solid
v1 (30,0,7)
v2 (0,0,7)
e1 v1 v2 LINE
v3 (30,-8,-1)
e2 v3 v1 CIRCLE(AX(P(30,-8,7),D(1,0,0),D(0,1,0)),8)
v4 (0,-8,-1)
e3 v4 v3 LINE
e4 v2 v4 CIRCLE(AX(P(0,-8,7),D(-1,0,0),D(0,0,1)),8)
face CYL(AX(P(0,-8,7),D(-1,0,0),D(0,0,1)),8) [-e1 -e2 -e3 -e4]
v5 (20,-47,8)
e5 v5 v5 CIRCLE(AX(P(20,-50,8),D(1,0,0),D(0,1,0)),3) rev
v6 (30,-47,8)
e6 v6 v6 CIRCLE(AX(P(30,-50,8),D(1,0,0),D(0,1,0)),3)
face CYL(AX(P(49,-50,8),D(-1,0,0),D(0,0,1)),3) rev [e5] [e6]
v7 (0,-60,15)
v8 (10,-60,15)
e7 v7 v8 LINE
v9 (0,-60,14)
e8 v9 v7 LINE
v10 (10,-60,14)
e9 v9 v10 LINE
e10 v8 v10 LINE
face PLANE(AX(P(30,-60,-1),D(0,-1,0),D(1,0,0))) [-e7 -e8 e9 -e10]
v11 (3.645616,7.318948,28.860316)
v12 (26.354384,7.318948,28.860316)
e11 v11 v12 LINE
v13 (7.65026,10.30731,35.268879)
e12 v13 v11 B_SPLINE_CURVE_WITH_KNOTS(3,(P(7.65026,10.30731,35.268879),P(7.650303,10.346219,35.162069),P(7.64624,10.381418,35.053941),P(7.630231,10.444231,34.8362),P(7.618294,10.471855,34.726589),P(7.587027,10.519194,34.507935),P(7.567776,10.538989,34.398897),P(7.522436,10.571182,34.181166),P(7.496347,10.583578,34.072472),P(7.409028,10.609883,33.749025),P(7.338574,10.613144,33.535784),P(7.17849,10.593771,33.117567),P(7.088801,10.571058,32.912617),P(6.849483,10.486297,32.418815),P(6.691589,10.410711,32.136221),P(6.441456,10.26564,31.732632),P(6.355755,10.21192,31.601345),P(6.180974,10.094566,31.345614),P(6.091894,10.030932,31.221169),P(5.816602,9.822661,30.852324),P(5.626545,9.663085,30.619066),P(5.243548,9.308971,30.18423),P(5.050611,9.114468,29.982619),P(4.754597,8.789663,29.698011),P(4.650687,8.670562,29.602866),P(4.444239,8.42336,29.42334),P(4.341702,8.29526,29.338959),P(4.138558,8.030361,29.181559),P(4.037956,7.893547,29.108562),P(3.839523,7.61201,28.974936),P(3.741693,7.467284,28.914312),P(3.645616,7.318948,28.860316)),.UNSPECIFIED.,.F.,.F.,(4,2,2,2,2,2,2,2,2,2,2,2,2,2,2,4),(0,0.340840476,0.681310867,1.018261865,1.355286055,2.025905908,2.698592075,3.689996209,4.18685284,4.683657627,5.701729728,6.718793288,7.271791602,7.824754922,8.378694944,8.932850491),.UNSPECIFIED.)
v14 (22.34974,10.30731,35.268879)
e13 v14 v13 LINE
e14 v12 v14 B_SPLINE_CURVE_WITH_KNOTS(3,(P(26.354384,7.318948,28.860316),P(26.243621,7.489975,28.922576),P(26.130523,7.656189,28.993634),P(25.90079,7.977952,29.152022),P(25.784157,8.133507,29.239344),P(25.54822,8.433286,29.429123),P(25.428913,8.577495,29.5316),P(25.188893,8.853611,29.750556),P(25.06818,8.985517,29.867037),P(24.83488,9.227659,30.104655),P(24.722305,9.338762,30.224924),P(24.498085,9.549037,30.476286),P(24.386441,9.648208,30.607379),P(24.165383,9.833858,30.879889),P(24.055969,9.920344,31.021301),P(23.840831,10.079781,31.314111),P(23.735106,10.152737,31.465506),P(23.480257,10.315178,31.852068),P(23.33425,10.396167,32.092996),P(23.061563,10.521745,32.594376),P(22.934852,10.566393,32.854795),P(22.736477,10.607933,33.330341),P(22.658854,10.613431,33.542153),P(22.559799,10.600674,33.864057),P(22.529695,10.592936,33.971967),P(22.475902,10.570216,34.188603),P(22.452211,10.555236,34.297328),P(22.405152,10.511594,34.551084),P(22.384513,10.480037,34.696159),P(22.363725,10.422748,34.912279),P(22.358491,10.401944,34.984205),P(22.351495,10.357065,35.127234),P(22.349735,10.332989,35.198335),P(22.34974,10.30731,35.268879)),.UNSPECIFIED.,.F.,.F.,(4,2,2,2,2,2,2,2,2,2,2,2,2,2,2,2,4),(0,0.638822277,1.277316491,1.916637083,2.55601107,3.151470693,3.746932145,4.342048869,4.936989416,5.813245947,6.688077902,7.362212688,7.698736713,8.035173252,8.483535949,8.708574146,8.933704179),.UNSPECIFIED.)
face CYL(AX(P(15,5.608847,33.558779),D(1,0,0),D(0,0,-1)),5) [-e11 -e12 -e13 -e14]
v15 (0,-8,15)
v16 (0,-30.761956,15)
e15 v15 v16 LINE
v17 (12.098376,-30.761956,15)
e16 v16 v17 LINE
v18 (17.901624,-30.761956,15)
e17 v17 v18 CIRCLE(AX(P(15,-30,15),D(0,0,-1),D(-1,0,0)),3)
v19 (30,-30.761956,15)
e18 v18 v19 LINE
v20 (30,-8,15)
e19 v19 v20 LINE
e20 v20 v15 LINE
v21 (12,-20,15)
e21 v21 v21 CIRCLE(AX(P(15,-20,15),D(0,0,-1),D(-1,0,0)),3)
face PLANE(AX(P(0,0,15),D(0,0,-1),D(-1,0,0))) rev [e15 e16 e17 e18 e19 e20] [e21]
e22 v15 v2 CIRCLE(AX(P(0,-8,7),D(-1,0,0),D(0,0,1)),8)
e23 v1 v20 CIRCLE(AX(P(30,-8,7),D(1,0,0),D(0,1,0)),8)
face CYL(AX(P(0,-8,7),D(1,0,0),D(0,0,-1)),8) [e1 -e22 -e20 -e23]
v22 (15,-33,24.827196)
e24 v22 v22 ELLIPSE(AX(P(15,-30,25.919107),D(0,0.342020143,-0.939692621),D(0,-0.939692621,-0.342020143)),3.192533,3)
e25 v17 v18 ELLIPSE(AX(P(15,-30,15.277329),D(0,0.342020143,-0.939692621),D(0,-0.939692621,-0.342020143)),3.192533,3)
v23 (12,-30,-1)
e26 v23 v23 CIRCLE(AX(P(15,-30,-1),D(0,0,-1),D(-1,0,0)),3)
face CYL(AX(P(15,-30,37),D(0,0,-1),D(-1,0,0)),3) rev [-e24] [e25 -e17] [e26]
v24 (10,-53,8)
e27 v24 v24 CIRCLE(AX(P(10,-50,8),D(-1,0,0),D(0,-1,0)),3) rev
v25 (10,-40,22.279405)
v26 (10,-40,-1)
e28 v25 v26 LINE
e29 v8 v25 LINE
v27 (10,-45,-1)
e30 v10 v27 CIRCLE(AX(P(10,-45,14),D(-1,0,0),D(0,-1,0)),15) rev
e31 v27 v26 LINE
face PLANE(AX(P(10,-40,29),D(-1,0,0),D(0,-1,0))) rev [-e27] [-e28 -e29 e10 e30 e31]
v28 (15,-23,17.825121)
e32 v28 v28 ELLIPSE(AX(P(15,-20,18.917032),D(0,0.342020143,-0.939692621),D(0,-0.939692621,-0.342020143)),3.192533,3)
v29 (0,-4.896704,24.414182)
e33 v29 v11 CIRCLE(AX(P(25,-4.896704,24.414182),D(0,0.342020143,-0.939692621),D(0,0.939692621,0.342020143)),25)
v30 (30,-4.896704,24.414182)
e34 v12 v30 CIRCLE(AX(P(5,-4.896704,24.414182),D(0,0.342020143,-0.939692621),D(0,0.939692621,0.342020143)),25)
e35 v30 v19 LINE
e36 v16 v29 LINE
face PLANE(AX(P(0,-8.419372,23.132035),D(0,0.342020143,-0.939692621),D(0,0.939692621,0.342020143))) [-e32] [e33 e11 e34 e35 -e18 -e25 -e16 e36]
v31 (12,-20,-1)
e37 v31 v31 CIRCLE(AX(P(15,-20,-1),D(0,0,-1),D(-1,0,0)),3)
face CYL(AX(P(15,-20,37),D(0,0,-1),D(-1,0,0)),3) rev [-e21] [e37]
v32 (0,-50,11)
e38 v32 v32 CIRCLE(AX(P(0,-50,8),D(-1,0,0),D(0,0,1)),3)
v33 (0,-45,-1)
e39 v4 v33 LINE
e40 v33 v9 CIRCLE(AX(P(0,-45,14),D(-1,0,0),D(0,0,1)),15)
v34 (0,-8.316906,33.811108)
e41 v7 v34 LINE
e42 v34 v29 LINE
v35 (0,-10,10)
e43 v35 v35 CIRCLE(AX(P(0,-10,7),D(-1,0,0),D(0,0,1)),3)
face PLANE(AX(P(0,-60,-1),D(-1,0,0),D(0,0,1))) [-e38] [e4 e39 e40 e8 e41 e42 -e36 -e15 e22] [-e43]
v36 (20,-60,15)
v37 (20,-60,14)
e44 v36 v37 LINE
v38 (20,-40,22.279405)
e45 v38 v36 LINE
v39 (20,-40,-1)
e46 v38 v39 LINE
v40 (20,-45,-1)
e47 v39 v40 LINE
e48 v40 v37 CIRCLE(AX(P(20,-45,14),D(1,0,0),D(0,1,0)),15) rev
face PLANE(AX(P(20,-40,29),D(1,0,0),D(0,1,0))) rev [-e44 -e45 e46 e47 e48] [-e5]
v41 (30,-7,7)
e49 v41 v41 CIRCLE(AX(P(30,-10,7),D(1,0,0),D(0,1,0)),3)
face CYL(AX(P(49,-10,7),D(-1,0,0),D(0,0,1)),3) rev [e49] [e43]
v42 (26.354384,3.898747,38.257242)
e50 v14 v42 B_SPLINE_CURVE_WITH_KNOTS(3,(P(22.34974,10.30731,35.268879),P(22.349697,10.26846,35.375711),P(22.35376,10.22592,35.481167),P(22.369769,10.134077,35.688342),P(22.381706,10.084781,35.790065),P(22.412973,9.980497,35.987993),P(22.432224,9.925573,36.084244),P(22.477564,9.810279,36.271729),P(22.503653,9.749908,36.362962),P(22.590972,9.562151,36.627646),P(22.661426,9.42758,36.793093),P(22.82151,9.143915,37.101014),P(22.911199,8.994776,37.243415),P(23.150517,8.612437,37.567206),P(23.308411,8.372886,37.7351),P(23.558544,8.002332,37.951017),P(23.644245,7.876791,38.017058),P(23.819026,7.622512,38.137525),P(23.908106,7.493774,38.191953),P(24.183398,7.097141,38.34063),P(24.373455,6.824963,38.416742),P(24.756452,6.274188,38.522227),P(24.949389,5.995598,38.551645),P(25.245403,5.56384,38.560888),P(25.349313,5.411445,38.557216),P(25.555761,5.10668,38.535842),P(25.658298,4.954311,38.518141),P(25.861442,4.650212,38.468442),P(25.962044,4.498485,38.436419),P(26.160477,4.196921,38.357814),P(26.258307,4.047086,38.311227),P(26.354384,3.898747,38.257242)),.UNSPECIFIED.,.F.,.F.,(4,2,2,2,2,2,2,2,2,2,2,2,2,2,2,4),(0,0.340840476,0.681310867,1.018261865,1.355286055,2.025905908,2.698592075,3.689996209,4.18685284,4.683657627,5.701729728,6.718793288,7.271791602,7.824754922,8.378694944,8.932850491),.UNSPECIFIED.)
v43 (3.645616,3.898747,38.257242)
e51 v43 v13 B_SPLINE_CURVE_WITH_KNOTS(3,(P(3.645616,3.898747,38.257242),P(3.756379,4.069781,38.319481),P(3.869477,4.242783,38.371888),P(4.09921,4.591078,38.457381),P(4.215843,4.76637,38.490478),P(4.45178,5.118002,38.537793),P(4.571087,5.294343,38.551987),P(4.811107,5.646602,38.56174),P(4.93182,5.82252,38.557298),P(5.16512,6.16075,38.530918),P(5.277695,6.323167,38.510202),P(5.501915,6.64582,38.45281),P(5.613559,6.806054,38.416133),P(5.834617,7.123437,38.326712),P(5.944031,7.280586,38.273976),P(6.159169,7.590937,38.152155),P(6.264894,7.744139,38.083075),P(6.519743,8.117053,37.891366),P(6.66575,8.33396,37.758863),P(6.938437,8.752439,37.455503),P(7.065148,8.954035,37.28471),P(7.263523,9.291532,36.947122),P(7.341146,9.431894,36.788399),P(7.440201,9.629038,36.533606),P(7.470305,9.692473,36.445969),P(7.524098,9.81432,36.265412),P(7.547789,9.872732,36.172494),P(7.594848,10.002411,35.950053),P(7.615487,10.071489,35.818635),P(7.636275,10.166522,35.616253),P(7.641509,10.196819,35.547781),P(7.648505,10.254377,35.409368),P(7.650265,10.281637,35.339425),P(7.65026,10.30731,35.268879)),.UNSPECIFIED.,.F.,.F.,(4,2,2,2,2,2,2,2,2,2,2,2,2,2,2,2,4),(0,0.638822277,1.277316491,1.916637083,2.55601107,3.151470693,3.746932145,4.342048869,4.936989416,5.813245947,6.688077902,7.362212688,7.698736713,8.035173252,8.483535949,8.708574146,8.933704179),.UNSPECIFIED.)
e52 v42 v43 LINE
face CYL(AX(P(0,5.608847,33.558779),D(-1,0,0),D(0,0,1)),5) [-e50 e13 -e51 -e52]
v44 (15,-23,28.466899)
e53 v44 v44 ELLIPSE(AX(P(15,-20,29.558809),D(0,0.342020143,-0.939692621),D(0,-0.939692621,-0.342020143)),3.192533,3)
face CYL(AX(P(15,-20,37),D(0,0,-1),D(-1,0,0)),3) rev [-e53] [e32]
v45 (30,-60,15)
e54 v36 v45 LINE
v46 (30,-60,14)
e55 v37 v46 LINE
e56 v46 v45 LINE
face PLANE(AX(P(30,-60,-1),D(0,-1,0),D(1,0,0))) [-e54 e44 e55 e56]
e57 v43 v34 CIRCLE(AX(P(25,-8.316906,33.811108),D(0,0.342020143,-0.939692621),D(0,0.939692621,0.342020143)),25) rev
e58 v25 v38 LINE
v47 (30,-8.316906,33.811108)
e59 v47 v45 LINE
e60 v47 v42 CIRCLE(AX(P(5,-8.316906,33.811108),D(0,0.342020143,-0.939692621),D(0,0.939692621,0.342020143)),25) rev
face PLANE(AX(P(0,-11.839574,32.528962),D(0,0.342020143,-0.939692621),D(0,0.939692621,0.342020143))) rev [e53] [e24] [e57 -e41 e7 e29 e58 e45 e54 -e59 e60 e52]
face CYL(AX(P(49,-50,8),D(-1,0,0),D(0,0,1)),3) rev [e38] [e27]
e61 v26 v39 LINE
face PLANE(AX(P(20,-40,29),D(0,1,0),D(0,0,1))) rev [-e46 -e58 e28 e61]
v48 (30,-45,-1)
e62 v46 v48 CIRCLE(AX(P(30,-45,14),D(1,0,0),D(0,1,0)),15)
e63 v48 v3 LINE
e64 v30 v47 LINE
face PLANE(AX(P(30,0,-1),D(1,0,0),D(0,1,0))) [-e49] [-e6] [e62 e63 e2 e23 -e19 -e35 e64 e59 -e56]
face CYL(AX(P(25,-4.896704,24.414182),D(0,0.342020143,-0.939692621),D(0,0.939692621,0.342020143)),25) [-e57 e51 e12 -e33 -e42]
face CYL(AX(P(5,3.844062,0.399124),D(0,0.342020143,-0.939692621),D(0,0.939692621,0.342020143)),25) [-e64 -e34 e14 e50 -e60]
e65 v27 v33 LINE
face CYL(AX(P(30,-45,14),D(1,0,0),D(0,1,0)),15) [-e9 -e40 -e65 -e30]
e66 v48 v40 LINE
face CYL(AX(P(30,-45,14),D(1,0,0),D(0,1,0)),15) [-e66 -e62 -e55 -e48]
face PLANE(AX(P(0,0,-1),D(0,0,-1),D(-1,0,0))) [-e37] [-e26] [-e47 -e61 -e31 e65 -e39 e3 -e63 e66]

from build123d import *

# Parameters (mm, degrees)
BOSS_EXTRUDE1_DEPTH      = 15
BOSS_EXTRUDE1_DEPTH_BACK = 1
SKETCH1_W                = 30
SKETCH1_H                = 60
SKETCH2_R                = 3
CUT_EXTRUDE1_DEPTH       = 49
FILLET1_R                = 8
SKETCH6_W                = 30
SKETCH6_H                = 80
BOSS_EXTRUDE2_DEPTH      = 10
SKETCH7_R                = 3
CUT_EXTRUDE2_DEPTH       = 38
SKETCH8_R                = 3
CUT_EXTRUDE3_DEPTH       = 49
SKETCH11_W               = 10
SKETCH11_H               = 20
CUT_EXTRUDE4_DEPTH       = 30
FILLET2_R                = 15
FILLET3_R                = 25
CUT_EXTRUDE5_DEPTH       = 10
FILLET5_R                = 5


# Some blends are built 0.0001 mm under size
with BuildPart() as part:
    # Sketch1 → Boss-Extrude1 (new, two sides: drawn at the far end of the back side and taken through both)
    with BuildSketch(Plane.XY.offset(-BOSS_EXTRUDE1_DEPTH_BACK)):
        with Locations((15, -30)):
            Rectangle(SKETCH1_W, SKETCH1_H)
    extrude(amount=BOSS_EXTRUDE1_DEPTH + BOSS_EXTRUDE1_DEPTH_BACK)

    # Sketch2 → Cut-Extrude1 (cut)
    with BuildSketch(Plane.ZY):
        with Locations((7, -10)):
            Circle(SKETCH2_R)
    extrude(amount=-CUT_EXTRUDE1_DEPTH, mode=Mode.SUBTRACT)

    # Fillet1
    fillet1_edges = [part.edges().sort_by_distance(p)[0] for p in [
        (15, 0, 15),
        (15, 0, -1),
    ]]
    fillet(fillet1_edges, radius=FILLET1_R - 0.0001)  # a hair under: the kernel refuses the full size

    # Sketch6 → Boss-Extrude2 (add)
    with BuildSketch(Plane(origin=(0, -11.839573779, 32.528961614), x_dir=(1, 0, 0), z_dir=(0, 0.34202014332566943, -0.9396926207859081))):
        with Locations((15, 11.251255097)):
            Rectangle(SKETCH6_W, SKETCH6_H)
    extrude(amount=BOSS_EXTRUDE2_DEPTH)

    # Sketch7 → Cut-Extrude2 (cut)
    with BuildSketch(Plane(origin=(0, 0, -1), x_dir=(-1, 0, 0), z_dir=(0, 0, -1))):
        with Locations(Location((-15, -20, 0), (0, 0, 270))):
            Circle(SKETCH7_R)
        with Locations((-15, -30)):
            Circle(SKETCH7_R)
    extrude(amount=-CUT_EXTRUDE2_DEPTH, mode=Mode.SUBTRACT)

    # Sketch8 → Cut-Extrude3 (cut)
    with BuildSketch(Plane.ZY):
        with Locations((8, -50)):
            Circle(SKETCH8_R)
    extrude(amount=-CUT_EXTRUDE3_DEPTH, mode=Mode.SUBTRACT)

    # Sketch11 → Cut-Extrude4 (cut)
    with BuildSketch(Plane(origin=(0, 0, -1), x_dir=(-1, 0, 0), z_dir=(0, 0, -1))):
        with Locations((-15, -50)):
            Rectangle(SKETCH11_W, SKETCH11_H)
    extrude(amount=-CUT_EXTRUDE4_DEPTH, mode=Mode.SUBTRACT)

    # Fillet2
    fillet2_edges = [part.edges().sort_by_distance(p)[0] for p in [
        (25, -60, -1),
        (5, -60, -1),
    ]]
    fillet(fillet2_edges, radius=FILLET2_R)

    # Fillet3
    # the kernel refuses this fillet: 25 mm, written as the material it takes off along each edge
    with BuildSketch(Plane(origin=(0, -6.200849295, 101.092400265), x_dir=(1, 0, 0), z_dir=(0, 0.34202014332566943, -0.9396926207859082)), Plane(origin=(30, -6.200849295, 101.092400265), x_dir=(0, -0.9396926207859081, -0.3420201433256693), z_dir=(0, 0.34202014332566943, -0.9396926207859082))) as fillet3_piece_1:
        with BuildLine():
            CenterArc((FILLET3_R, FILLET3_R), FILLET3_R, 180, 90)
            Line((0, FILLET3_R), (0, 0))
            Line((0, 0), (FILLET3_R, 0))
        make_face()
    extrude(amount=135, mode=Mode.SUBTRACT)

    # Sketch12 → Cut-Extrude5 (cut)
    with BuildSketch(Plane(origin=(0, -8.419372346, 23.132035406), x_dir=(-1, 0, 0), z_dir=(0, 0.34202014332566943, -0.9396926207859082))):
        with BuildLine():
            Line((-15, 21.748370766), (-7.650260268, 21.748370766))
            ThreePointArc((-7.650260268, 21.748370766), (-15, 27.089106291), (-22.349739732, 21.748370766))
            Line((-22.349739732, 21.748370766), (-15, 21.748370766))
        make_face()
    extrude(amount=-CUT_EXTRUDE5_DEPTH, mode=Mode.SUBTRACT)

    # Fillet5
    fillet5_edges = [part.edges().sort_by_distance(p)[0] for p in [
        (15, 8.597209744, 39.967342501),
        (15, 12.017411178, 30.570416293),
    ]]
    fillet(fillet5_edges, radius=FILLET5_R - 0.0001)  # a hair under: the kernel refuses the full size


solid = part.part
